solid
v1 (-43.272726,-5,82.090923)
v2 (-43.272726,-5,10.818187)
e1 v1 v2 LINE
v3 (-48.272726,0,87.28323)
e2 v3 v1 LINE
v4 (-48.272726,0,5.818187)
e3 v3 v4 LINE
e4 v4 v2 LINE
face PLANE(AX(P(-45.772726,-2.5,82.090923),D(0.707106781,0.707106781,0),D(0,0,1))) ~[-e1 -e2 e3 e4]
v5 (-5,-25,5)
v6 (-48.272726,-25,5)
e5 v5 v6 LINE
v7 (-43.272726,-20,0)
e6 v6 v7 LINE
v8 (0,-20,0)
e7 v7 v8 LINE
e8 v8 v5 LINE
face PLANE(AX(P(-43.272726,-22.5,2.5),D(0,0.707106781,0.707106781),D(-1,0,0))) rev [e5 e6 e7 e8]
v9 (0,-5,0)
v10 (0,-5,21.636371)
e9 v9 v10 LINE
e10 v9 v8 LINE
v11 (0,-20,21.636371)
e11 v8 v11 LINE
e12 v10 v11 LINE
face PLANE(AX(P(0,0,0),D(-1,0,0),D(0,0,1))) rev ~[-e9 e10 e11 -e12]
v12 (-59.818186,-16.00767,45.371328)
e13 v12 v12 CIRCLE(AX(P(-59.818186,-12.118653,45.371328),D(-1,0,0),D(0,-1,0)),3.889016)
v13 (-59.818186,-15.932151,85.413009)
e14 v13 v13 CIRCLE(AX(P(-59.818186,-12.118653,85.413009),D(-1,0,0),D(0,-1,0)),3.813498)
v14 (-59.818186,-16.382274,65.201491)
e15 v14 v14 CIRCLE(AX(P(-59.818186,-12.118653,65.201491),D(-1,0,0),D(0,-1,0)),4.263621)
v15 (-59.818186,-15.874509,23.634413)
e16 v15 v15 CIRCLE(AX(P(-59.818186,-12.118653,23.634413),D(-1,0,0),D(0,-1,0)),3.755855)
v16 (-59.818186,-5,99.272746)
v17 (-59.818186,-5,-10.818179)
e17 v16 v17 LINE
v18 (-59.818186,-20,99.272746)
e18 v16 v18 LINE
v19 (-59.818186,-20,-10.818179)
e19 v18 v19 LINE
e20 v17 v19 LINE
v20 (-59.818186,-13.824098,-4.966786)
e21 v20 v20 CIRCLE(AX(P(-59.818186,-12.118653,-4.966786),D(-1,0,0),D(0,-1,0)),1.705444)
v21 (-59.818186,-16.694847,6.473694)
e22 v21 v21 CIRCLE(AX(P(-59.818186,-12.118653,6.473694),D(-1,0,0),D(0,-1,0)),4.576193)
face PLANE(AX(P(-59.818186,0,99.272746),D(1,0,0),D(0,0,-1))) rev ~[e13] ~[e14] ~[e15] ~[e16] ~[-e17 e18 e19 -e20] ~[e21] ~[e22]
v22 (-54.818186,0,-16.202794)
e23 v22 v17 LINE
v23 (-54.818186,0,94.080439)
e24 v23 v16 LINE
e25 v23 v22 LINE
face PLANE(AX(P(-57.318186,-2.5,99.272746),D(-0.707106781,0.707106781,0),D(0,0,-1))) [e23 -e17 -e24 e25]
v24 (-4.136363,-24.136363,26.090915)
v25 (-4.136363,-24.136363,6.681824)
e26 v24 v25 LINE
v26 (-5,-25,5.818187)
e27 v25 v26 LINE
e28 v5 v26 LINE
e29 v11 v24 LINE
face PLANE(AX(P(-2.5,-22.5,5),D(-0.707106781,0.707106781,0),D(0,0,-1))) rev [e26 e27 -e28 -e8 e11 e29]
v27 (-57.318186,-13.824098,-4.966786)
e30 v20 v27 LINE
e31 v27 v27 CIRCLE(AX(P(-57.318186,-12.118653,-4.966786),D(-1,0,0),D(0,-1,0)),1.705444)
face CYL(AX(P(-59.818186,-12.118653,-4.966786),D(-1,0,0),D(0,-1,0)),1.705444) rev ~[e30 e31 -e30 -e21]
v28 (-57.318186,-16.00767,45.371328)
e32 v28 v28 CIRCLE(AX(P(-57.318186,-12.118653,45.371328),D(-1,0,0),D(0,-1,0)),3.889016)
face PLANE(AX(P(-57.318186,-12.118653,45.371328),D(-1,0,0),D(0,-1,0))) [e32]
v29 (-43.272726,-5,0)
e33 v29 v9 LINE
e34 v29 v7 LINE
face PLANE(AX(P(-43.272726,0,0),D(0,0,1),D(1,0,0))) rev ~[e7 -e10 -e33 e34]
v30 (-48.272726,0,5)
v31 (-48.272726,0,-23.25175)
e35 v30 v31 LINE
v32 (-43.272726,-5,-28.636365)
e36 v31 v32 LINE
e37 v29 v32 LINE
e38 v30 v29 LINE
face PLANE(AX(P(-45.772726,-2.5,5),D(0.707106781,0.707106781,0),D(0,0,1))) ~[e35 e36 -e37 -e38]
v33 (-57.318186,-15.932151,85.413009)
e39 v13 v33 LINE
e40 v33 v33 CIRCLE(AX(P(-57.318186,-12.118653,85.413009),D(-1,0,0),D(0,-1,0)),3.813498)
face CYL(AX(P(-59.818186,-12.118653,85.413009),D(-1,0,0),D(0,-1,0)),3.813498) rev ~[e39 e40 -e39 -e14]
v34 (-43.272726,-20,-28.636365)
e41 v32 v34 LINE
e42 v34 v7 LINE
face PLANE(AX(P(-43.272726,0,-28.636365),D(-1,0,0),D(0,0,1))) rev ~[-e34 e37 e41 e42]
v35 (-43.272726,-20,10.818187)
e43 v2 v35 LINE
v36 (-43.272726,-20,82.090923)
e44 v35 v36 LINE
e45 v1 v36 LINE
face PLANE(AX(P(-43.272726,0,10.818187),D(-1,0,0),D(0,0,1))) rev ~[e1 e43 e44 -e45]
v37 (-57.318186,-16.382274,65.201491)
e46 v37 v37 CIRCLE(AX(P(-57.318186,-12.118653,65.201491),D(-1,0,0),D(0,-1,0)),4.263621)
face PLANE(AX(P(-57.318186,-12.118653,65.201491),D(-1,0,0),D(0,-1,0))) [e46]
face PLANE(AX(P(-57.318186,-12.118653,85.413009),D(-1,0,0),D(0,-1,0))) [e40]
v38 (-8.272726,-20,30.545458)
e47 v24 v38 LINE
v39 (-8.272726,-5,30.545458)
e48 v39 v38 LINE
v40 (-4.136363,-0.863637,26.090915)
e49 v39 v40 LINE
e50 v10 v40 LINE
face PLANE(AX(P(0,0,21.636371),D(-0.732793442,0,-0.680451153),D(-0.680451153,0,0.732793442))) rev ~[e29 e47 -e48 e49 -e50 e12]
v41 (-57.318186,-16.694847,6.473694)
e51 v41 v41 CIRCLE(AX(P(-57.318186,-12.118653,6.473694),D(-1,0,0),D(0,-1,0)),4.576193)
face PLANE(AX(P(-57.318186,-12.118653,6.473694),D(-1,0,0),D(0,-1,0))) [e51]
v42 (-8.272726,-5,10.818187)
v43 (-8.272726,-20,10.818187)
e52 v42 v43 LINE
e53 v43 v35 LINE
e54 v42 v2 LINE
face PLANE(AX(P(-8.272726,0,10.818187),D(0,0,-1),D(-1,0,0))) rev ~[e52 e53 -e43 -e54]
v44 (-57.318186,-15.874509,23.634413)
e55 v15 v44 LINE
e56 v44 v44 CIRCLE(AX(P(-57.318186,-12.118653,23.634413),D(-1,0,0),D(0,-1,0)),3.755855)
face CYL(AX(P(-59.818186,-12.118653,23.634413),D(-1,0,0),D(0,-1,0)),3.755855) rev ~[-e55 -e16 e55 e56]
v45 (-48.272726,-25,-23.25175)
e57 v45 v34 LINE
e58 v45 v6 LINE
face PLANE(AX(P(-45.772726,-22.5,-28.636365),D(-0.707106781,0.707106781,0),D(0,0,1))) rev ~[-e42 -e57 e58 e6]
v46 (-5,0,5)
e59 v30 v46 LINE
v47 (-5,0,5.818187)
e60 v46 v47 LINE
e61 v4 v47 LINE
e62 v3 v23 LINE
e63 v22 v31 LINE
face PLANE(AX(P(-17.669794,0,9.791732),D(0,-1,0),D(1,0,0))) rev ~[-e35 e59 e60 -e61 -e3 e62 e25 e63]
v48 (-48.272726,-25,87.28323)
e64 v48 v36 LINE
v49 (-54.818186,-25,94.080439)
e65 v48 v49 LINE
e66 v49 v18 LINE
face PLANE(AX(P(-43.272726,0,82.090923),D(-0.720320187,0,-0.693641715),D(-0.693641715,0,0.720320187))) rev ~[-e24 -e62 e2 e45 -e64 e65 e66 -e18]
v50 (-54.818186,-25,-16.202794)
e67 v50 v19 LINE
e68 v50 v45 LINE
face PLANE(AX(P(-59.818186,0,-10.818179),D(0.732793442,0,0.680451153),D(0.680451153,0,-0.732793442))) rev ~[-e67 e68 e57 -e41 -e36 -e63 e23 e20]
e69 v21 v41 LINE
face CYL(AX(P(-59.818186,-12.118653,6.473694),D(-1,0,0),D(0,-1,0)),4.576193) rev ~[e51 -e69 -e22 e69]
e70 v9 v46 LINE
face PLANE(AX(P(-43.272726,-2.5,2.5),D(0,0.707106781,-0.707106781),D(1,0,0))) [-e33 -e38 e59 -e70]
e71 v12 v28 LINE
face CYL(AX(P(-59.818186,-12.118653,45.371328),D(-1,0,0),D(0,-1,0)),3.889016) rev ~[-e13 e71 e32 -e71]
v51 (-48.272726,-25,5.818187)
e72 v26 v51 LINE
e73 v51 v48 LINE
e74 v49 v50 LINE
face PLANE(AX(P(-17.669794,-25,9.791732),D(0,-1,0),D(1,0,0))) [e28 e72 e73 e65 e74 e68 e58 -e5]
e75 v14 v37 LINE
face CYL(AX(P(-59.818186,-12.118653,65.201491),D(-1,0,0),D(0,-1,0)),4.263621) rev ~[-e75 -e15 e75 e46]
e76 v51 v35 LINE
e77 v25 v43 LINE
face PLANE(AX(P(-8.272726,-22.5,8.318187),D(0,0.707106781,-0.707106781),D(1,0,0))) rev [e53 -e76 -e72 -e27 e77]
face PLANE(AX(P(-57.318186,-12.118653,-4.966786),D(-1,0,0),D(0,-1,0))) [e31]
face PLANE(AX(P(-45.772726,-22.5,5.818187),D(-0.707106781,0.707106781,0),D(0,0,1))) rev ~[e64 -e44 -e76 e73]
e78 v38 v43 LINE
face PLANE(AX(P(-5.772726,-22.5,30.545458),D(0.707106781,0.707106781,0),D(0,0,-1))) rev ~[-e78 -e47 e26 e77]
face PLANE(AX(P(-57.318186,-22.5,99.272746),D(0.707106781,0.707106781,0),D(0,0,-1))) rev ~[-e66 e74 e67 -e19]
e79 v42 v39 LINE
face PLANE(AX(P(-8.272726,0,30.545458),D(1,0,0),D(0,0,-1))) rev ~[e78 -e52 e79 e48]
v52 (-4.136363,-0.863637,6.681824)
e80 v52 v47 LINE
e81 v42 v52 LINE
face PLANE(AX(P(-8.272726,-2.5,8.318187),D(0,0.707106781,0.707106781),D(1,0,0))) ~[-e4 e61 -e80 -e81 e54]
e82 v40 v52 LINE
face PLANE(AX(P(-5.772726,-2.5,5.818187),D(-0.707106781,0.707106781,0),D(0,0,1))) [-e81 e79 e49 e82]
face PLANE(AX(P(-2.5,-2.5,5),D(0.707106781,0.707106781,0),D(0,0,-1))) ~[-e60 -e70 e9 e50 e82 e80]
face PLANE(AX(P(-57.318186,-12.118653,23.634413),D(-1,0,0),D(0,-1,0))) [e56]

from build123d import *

# Parameters (mm, degrees)
F1_DEPTH   = 25
F2_SIZE    = 5
F3_SIZE    = 5
F4_C1_SIZE = 5
F4_C2_SIZE = 5
F4_C3_SIZE = 5
F4_C4_SIZE = 5
F5_SIZE    = 5
F6_R       = 3.8134977221
F6_R_2     = 4.2636207358
F6_R_3     = 3.889016134
F6_R_4     = 3.7558552916
F6_R_5     = 4.5761931688
F6_R_6     = 1.7054444875
F7_DEPTH   = 2.5


with BuildPart() as f1:
    # F0 (on Front) → F1 (new body)
    with BuildSketch(Plane.XZ):
        Polygon((0, 0), (0, 21.6363706006), (-8.27272566, 30.5454584579), (-8.27272566, 10.8181868544), (-43.27272566, 10.8181868544), (-43.27272566, 0), align=None)
        Polygon((-43.27272566, -28.6363649917), (-43.27272566, 0), (-43.27272566, 10.8181868544), (-43.27272566, 82.0909227153), (-59.8181864452, 99.2727460619), (-59.8181864452, -10.8181790838), align=None)
    extrude(amount=F1_DEPTH)

    # F2
    f2_edges = [f1.edges().sort_by_distance(p)[0] for p in [
        (-25.772726, -25, 10.818187),
        (-21.636363, -25, 0),
    ]]
    chamfer(f2_edges, length=F2_SIZE)

    # F3
    f3_edges = [f1.edges().sort_by_distance(p)[0] for p in [
        (-25.772726, 0, 10.818187),
        (-21.636363, 0, 0),
    ]]
    chamfer(f3_edges, length=F3_SIZE)

    # F4: chamfer of 5 on 4 edges, made by hand

    # F4_c1
    f4_c1_edges = [f1.edges().sort_by_distance(p)[0] for p in [
        (-8.27272566, 0, 20.6818226561),
        (-8.27272566, 0, 8.3181868544),
    ]]
    chamfer(f4_c1_edges, length=F4_C1_SIZE)

    # F4_c2
    f4_c2_edges = [f1.edges().sort_by_distance(p)[0] for p in [
        (-8.27272566, -25, 20.6818226561),
        (-8.27272566, -25, 8.3181868544),
    ]]
    chamfer(f4_c2_edges, length=F4_C2_SIZE)

    # F4_c3
    f4_c3_edges = [f1.edges().sort_by_distance(p)[0] for p in [
        (0, 0, 13.3181853003),
    ]]
    chamfer(f4_c3_edges, length=F4_C3_SIZE)

    # F4_c4
    f4_c4_edges = [f1.edges().sort_by_distance(p)[0] for p in [
        (0, -25, 13.3181853003),
    ]]
    chamfer(f4_c4_edges, length=F4_C4_SIZE)

    # F5
    f5_edges = [f1.edges().sort_by_distance(p)[0] for p in [
        (-43.272726, 0, 46.454555),
        (-43.272726, 0, -14.318182),
        (-59.818186, 0, 44.227283),
        (-43.272726, -25, 46.454555),
        (-43.272726, -25, -14.318182),
        (-59.818186, -25, 44.227283),
    ]]
    chamfer(f5_edges, length=F5_SIZE)

    # F6 (on face) → F7 (cut)
    with BuildSketch(Plane(origin=(-59.8181864452, 0, 0), x_dir=(0, -1, 0), z_dir=(-1, 0, 0))):
        with Locations((12.1186533943, 85.4130089283)):
            Circle(F6_R)
        with Locations((12.1186533943, 65.2014911175)):
            Circle(F6_R_2)
        with Locations((12.1186533943, 45.3713275492)):
            Circle(F6_R_3)
        with Locations((12.1186533943, 23.6344132572)):
            Circle(F6_R_4)
        with Locations((12.1186533943, 6.4736939967)):
            Circle(F6_R_5)
        with Locations((12.1186533943, -4.9667861313)):
            Circle(F6_R_6)
    extrude(amount=-F7_DEPTH, mode=Mode.SUBTRACT)


solid = f1.part
